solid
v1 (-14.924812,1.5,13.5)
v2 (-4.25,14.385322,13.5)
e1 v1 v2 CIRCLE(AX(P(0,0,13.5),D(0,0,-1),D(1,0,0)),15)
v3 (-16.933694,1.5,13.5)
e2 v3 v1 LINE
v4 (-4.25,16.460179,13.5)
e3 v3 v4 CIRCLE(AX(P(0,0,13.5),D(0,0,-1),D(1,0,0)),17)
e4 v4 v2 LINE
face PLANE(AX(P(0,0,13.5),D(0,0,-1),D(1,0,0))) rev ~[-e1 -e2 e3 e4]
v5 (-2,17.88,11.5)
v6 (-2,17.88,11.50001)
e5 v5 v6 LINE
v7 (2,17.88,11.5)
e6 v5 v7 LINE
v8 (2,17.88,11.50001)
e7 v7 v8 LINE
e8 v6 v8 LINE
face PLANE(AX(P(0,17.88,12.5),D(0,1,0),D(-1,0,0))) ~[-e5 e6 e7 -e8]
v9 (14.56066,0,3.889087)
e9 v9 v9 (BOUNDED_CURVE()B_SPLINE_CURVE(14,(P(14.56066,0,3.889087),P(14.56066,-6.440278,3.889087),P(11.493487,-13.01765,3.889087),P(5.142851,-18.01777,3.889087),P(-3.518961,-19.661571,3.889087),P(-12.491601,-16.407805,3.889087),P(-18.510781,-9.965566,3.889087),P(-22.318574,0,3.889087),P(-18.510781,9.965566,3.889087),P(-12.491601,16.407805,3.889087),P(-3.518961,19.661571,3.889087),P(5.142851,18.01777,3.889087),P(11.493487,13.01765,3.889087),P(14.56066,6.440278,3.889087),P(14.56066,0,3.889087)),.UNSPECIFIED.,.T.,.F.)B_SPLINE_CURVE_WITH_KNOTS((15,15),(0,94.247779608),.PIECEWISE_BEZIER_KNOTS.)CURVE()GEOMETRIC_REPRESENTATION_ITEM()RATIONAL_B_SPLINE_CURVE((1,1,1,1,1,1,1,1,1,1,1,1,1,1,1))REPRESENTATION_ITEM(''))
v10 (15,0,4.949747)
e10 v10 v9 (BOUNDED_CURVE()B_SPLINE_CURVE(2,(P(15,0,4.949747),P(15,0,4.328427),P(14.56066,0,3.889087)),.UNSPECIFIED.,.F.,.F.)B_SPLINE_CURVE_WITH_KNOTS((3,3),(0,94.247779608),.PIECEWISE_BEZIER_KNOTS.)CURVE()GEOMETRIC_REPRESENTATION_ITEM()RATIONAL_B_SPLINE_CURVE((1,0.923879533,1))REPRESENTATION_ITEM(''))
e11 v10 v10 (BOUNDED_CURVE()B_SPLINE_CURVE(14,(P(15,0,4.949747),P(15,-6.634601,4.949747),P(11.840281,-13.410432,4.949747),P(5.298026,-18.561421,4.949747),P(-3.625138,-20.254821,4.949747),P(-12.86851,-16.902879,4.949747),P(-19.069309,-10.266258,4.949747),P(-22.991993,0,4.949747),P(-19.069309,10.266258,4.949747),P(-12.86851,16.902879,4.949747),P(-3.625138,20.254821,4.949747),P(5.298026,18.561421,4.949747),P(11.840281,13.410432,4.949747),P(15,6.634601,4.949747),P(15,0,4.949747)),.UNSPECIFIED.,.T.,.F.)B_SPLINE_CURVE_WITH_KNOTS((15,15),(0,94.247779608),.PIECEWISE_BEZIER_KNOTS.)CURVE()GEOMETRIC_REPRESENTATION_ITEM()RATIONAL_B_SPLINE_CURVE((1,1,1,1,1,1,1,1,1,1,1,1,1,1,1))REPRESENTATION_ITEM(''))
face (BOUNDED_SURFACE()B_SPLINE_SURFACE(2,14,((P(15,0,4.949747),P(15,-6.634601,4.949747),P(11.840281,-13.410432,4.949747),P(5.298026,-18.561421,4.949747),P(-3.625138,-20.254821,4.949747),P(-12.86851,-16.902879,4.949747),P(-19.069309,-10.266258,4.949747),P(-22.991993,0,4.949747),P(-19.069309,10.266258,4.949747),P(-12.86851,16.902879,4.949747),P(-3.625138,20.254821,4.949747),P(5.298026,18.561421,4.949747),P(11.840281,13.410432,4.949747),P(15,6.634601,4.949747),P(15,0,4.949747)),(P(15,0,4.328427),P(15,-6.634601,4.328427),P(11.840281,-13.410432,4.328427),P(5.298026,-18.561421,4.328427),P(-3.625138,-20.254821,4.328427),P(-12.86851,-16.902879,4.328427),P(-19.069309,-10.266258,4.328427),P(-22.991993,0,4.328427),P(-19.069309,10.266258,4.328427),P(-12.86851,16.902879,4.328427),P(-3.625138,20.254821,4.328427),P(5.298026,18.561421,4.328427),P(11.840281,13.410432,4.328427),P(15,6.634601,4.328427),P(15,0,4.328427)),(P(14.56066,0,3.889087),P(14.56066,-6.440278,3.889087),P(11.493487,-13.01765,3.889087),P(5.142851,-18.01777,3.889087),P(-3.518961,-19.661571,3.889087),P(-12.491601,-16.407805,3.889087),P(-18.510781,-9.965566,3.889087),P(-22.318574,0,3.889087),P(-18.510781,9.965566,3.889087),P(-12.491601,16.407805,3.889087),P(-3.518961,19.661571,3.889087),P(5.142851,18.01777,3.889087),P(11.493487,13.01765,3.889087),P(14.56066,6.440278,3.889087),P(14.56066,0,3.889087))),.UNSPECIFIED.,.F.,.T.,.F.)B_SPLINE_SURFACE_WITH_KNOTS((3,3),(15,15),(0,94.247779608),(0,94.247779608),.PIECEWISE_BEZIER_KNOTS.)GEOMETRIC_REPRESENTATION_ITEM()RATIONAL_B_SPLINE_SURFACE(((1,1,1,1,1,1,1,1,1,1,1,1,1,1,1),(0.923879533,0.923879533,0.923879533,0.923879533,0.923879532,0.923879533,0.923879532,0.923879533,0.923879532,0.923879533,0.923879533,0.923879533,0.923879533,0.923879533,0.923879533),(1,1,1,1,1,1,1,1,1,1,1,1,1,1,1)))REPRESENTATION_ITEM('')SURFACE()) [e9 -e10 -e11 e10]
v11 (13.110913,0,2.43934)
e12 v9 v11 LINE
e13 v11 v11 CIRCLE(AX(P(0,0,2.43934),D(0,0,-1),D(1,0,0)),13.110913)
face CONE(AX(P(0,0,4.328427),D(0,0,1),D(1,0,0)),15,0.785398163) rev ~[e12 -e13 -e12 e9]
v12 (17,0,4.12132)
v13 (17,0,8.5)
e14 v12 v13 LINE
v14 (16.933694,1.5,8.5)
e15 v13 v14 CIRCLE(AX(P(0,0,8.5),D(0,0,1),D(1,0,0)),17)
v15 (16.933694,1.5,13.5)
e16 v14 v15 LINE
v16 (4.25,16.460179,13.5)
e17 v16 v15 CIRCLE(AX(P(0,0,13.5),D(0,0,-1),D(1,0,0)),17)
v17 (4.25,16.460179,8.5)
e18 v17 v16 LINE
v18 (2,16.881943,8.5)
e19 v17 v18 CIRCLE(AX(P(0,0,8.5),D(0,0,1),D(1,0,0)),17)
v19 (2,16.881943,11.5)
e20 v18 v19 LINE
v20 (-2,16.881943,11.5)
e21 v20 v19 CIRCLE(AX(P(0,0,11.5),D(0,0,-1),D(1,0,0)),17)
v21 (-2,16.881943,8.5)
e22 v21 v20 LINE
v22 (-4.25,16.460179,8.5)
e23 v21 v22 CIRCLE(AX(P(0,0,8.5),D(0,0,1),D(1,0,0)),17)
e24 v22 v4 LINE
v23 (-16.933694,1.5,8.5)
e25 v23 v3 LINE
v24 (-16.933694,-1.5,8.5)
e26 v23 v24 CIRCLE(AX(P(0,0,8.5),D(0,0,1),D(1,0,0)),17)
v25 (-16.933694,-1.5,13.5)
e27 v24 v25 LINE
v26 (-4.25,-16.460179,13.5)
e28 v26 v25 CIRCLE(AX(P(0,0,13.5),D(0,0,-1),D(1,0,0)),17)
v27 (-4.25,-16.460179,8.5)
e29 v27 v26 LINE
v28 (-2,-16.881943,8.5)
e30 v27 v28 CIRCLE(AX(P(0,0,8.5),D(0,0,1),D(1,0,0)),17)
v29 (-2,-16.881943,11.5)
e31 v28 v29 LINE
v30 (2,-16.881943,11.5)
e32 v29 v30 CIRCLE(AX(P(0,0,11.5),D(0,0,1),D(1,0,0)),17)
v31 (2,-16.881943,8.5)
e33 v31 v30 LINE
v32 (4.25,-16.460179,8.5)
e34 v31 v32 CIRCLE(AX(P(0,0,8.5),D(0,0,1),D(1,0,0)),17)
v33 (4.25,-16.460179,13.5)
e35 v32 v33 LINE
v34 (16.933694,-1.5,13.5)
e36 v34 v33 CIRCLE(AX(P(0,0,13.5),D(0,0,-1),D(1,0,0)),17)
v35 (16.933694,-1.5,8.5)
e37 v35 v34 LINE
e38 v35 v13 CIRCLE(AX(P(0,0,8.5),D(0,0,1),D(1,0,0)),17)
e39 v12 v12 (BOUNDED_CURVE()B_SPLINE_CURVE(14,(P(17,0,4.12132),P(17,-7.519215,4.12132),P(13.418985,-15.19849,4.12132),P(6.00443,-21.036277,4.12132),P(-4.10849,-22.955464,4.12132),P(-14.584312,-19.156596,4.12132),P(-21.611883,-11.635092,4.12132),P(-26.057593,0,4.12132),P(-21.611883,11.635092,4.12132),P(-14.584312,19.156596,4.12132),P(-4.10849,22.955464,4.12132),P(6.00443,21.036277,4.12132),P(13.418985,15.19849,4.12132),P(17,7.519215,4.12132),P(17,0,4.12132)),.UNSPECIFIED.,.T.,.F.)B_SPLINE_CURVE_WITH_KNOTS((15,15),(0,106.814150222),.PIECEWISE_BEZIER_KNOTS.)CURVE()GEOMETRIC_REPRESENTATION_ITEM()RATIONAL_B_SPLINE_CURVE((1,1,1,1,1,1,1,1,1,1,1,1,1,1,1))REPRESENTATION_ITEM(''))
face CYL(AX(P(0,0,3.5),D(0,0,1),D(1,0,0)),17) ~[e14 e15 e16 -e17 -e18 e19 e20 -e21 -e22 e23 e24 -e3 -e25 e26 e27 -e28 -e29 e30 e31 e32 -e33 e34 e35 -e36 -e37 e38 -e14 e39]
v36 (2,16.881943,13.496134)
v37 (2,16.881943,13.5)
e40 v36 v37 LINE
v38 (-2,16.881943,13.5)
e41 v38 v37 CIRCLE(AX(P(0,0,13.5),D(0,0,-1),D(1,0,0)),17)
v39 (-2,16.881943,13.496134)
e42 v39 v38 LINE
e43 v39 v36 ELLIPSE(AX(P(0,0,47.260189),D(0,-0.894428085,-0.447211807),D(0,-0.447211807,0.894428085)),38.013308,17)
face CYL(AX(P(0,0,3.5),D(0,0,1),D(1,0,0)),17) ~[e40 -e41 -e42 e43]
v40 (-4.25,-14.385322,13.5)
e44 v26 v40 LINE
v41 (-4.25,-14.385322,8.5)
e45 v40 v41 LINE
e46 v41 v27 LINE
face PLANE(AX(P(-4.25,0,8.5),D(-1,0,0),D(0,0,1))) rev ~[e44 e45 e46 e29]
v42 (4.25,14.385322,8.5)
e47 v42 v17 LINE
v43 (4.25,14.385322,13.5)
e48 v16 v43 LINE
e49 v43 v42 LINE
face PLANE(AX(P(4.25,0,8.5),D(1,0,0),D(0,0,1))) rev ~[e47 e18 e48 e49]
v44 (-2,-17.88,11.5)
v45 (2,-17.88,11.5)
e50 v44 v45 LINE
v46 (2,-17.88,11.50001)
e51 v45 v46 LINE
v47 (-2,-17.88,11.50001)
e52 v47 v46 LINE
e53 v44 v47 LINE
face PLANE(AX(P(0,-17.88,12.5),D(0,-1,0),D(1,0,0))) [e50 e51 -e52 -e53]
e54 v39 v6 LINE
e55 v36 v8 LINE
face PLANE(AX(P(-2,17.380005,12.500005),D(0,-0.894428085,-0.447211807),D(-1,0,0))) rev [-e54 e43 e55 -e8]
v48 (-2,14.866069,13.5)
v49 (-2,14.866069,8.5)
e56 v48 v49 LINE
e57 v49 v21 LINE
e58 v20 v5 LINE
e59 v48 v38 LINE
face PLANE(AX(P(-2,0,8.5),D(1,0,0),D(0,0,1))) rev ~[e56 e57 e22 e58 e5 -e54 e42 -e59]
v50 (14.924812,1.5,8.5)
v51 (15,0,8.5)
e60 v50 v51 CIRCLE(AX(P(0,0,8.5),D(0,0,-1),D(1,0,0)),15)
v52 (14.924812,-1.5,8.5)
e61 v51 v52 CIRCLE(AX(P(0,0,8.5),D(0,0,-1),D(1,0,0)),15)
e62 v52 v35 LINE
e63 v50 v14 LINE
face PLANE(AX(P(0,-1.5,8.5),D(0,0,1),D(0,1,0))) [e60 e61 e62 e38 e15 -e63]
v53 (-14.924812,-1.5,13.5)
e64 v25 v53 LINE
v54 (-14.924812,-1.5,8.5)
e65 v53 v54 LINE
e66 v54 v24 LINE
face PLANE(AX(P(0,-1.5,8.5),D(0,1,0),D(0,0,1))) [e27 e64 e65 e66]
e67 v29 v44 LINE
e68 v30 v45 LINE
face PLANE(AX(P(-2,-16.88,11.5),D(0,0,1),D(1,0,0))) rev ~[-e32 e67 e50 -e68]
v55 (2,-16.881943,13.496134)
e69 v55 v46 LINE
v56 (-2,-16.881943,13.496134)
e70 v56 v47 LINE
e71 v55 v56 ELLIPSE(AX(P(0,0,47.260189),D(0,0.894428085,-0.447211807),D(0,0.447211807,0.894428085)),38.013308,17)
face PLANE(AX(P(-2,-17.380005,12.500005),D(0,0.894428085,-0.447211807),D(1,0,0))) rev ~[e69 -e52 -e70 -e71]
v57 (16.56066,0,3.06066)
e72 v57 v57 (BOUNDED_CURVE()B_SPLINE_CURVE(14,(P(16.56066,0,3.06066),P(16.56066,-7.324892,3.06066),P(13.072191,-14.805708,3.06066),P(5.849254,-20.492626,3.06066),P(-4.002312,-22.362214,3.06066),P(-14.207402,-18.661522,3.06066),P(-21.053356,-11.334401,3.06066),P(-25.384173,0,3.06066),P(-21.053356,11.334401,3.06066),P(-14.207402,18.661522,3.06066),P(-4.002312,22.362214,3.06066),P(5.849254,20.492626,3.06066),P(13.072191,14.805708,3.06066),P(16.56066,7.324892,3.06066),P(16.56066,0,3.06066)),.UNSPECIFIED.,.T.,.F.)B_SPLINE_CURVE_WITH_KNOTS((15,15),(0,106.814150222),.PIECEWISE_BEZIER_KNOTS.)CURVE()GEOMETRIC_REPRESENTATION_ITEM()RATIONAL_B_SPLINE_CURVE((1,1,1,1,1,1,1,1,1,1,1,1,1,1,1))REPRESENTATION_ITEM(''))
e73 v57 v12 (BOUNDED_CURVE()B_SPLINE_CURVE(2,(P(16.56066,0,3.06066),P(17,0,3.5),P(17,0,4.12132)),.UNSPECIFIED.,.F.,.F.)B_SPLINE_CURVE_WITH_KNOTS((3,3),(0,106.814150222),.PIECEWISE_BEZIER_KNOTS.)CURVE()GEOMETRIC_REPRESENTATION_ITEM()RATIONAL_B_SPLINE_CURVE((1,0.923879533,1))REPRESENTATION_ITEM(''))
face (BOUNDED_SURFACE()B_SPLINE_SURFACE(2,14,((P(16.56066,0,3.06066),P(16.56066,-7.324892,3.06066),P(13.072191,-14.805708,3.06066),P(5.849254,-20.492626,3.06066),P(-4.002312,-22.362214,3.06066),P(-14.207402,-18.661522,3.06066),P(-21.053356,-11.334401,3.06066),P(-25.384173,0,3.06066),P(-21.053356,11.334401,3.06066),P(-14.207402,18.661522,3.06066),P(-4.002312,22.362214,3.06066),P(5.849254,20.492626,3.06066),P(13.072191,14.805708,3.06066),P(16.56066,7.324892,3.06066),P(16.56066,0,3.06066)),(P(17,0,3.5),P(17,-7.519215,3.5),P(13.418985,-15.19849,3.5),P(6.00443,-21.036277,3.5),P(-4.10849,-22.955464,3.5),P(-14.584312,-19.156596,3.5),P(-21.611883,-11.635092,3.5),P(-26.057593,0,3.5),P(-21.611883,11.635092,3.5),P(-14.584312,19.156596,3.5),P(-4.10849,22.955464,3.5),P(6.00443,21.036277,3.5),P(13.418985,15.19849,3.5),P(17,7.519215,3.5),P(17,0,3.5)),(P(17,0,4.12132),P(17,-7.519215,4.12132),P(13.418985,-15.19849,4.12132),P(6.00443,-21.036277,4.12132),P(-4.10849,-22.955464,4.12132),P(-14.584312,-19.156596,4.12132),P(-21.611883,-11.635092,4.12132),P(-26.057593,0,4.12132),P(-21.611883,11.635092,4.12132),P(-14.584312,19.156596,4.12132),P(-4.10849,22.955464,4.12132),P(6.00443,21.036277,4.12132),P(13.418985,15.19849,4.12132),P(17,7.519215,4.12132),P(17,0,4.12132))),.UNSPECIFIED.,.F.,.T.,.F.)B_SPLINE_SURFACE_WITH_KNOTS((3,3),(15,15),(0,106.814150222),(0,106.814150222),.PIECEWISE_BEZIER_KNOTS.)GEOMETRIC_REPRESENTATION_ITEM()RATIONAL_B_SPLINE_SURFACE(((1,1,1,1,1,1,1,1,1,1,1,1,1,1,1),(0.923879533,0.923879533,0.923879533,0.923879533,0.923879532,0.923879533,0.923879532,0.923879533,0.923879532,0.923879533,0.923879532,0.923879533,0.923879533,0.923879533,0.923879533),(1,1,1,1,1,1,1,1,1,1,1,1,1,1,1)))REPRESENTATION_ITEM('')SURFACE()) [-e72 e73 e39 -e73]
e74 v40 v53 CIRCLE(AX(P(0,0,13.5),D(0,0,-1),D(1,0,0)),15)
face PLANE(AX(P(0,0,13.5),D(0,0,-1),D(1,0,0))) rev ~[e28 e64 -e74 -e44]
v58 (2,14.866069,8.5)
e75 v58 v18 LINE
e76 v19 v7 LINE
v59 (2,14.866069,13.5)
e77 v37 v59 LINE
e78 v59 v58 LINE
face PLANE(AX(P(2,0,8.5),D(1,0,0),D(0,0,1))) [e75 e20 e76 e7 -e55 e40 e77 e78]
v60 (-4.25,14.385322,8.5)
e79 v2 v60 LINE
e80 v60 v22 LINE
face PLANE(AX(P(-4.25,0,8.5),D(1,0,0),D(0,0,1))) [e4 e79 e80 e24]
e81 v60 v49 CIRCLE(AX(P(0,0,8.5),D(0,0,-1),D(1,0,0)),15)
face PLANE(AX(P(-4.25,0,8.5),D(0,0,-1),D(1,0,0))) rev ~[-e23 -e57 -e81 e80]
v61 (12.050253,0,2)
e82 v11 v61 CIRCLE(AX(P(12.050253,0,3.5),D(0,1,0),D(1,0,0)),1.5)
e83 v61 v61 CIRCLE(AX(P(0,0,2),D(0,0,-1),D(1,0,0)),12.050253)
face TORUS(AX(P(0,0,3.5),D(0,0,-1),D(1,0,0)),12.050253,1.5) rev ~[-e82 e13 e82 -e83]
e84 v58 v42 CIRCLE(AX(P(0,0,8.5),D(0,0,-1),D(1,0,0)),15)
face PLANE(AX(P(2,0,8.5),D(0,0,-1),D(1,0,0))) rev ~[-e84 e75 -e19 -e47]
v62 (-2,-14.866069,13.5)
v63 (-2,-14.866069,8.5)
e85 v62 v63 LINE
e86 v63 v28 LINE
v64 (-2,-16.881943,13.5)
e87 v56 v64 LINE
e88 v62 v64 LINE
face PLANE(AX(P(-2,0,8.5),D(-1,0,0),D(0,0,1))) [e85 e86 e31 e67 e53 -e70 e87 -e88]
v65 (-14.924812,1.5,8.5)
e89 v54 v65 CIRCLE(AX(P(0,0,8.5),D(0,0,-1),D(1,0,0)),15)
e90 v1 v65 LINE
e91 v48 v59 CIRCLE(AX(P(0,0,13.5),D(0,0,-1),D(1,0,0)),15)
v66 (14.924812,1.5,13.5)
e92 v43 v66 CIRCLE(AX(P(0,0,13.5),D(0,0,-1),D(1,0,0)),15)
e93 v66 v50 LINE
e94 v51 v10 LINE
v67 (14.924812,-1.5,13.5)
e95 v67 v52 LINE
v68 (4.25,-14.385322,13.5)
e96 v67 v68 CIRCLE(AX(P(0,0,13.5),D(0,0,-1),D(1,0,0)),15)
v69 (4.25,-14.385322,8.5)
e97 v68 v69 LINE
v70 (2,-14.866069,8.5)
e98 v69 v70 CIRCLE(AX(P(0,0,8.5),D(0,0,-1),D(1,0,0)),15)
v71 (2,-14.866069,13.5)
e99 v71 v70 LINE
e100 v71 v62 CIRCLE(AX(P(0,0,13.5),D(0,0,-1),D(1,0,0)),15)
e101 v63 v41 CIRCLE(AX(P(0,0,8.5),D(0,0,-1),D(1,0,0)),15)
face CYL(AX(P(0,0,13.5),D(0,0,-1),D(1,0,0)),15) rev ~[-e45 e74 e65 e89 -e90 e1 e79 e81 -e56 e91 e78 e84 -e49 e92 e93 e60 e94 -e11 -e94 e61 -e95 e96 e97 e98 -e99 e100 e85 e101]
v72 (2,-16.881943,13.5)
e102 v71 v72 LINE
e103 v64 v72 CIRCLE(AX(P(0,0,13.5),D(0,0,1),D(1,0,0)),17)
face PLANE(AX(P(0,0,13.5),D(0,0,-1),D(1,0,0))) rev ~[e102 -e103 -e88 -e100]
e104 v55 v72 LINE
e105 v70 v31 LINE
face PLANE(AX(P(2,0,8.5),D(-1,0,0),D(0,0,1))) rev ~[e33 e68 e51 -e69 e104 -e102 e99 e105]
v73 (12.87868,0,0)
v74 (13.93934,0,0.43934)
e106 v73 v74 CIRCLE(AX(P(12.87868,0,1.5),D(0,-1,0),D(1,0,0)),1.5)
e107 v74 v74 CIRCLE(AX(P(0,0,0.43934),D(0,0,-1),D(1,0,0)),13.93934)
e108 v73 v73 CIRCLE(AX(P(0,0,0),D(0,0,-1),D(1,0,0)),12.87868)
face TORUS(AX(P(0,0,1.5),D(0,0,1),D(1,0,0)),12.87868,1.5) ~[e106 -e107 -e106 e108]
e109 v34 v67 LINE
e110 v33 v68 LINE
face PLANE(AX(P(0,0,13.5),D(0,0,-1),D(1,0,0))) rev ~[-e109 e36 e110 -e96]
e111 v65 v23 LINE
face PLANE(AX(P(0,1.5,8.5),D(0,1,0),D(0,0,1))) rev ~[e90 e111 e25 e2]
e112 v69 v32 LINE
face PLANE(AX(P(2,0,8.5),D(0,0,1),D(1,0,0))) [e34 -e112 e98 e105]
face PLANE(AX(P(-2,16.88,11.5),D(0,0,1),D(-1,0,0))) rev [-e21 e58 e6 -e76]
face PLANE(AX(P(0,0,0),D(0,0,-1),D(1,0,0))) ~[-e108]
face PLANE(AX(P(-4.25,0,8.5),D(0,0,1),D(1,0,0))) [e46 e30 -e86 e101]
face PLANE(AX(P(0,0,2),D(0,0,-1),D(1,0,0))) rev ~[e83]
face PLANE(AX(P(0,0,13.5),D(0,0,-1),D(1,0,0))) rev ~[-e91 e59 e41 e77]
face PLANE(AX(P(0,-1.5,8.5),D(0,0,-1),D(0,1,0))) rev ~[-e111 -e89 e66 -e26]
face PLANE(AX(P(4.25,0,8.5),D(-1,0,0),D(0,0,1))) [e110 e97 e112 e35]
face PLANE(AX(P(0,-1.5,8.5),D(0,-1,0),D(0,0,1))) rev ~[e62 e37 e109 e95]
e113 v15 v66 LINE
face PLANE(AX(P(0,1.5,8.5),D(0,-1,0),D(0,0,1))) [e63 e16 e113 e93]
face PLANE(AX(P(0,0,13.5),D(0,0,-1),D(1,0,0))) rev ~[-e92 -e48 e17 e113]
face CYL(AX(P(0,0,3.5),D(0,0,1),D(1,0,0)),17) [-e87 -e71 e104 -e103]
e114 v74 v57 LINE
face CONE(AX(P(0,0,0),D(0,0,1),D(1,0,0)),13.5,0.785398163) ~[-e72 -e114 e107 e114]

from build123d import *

# Parameters (mm, degrees)
F2_W          = 3
F2_H          = 6.5
F3_DEPTH      = 25
F3_DEPTH_BACK = 25
F4_W          = 2.25
F4_H          = 6.5
F5_DEPTH      = 25
F5_DEPTH_BACK = 25
F6_R          = 1.5
F8_W          = 4
F8_H          = 2
F9_DEPTH      = 1
F10_SIZE2     = 1.99999
F10_SIZE      = 0.99999


# Not quite as in the source:
# - a fillet or chamfer is up to 0.001 mm smaller than in the source, because OpenCascade refuses the exact size


with BuildPart() as f1:
    # F0 (on Front) → F1 (revolve)
    with BuildSketch(Plane.XZ):
        Polygon((0, 2), (0, 0), (13.5, 0), (17, 3.5), (17, 13.5), (15, 13.5), (15, 4.3284271247), (12.6715728753, 2), align=None)
    revolve(axis=Axis((0, 0, 1), (0, 0, -1)))

    # F2 (on Right) → F3 (cut, two sides)
    with BuildSketch(Plane.YZ) as f3_sk:
        with Locations((0, 11.75)):
            Rectangle(F2_W, F2_H)
    extrude(amount=F3_DEPTH, mode=Mode.SUBTRACT)
    extrude(f3_sk.sketch, amount=-F3_DEPTH_BACK, mode=Mode.SUBTRACT)

    # F4 (on Front) → F5 (cut, two sides)
    with BuildSketch(Plane.XZ) as f5_sk:
        with Locations((-3.125, 11.75)):
            Rectangle(F4_W, F4_H)
        with Locations((3.125, 11.75)):
            Rectangle(F4_W, F4_H)
    extrude(amount=F5_DEPTH, mode=Mode.SUBTRACT)
    extrude(f5_sk.sketch, amount=-F5_DEPTH_BACK, mode=Mode.SUBTRACT)

    # F6
    f6_edges = [f1.edges().sort_by_distance(p)[0] for p in [
        (-12.671573, 0, 2),
        (-15, 0, 4.328427),
        (-17, 0, 3.5),
        (-13.5, 0, 0),
    ]]
    fillet(f6_edges, radius=F6_R)

    # F8 (on offset) → F9 (join)
    with BuildSketch(Plane.XZ.offset(16.88)):
        with Locations((0, 12.5)):
            Rectangle(F8_W, F8_H)
    extrude(amount=F9_DEPTH)

    # F10 (size 1 and 2 in the source; OpenCascade refuses exactly that, so slightly less here)
    f10_edges = [f1.edges().sort_by_distance(p)[0] for p in [
        (0, -17.88, 13.5),
    ]]
    f10_side = f1.faces().sort_by_distance((0, -16.417446, 13.5))[0]
    chamfer(f10_edges, length=F10_SIZE, length2=F10_SIZE2, reference=f10_side)

    # F11: F1 across plane


with BuildPart() as f1_1:
    add(f1.part)
    add(f1.part.mirror(Plane.XZ))


solid = f1_1.part
